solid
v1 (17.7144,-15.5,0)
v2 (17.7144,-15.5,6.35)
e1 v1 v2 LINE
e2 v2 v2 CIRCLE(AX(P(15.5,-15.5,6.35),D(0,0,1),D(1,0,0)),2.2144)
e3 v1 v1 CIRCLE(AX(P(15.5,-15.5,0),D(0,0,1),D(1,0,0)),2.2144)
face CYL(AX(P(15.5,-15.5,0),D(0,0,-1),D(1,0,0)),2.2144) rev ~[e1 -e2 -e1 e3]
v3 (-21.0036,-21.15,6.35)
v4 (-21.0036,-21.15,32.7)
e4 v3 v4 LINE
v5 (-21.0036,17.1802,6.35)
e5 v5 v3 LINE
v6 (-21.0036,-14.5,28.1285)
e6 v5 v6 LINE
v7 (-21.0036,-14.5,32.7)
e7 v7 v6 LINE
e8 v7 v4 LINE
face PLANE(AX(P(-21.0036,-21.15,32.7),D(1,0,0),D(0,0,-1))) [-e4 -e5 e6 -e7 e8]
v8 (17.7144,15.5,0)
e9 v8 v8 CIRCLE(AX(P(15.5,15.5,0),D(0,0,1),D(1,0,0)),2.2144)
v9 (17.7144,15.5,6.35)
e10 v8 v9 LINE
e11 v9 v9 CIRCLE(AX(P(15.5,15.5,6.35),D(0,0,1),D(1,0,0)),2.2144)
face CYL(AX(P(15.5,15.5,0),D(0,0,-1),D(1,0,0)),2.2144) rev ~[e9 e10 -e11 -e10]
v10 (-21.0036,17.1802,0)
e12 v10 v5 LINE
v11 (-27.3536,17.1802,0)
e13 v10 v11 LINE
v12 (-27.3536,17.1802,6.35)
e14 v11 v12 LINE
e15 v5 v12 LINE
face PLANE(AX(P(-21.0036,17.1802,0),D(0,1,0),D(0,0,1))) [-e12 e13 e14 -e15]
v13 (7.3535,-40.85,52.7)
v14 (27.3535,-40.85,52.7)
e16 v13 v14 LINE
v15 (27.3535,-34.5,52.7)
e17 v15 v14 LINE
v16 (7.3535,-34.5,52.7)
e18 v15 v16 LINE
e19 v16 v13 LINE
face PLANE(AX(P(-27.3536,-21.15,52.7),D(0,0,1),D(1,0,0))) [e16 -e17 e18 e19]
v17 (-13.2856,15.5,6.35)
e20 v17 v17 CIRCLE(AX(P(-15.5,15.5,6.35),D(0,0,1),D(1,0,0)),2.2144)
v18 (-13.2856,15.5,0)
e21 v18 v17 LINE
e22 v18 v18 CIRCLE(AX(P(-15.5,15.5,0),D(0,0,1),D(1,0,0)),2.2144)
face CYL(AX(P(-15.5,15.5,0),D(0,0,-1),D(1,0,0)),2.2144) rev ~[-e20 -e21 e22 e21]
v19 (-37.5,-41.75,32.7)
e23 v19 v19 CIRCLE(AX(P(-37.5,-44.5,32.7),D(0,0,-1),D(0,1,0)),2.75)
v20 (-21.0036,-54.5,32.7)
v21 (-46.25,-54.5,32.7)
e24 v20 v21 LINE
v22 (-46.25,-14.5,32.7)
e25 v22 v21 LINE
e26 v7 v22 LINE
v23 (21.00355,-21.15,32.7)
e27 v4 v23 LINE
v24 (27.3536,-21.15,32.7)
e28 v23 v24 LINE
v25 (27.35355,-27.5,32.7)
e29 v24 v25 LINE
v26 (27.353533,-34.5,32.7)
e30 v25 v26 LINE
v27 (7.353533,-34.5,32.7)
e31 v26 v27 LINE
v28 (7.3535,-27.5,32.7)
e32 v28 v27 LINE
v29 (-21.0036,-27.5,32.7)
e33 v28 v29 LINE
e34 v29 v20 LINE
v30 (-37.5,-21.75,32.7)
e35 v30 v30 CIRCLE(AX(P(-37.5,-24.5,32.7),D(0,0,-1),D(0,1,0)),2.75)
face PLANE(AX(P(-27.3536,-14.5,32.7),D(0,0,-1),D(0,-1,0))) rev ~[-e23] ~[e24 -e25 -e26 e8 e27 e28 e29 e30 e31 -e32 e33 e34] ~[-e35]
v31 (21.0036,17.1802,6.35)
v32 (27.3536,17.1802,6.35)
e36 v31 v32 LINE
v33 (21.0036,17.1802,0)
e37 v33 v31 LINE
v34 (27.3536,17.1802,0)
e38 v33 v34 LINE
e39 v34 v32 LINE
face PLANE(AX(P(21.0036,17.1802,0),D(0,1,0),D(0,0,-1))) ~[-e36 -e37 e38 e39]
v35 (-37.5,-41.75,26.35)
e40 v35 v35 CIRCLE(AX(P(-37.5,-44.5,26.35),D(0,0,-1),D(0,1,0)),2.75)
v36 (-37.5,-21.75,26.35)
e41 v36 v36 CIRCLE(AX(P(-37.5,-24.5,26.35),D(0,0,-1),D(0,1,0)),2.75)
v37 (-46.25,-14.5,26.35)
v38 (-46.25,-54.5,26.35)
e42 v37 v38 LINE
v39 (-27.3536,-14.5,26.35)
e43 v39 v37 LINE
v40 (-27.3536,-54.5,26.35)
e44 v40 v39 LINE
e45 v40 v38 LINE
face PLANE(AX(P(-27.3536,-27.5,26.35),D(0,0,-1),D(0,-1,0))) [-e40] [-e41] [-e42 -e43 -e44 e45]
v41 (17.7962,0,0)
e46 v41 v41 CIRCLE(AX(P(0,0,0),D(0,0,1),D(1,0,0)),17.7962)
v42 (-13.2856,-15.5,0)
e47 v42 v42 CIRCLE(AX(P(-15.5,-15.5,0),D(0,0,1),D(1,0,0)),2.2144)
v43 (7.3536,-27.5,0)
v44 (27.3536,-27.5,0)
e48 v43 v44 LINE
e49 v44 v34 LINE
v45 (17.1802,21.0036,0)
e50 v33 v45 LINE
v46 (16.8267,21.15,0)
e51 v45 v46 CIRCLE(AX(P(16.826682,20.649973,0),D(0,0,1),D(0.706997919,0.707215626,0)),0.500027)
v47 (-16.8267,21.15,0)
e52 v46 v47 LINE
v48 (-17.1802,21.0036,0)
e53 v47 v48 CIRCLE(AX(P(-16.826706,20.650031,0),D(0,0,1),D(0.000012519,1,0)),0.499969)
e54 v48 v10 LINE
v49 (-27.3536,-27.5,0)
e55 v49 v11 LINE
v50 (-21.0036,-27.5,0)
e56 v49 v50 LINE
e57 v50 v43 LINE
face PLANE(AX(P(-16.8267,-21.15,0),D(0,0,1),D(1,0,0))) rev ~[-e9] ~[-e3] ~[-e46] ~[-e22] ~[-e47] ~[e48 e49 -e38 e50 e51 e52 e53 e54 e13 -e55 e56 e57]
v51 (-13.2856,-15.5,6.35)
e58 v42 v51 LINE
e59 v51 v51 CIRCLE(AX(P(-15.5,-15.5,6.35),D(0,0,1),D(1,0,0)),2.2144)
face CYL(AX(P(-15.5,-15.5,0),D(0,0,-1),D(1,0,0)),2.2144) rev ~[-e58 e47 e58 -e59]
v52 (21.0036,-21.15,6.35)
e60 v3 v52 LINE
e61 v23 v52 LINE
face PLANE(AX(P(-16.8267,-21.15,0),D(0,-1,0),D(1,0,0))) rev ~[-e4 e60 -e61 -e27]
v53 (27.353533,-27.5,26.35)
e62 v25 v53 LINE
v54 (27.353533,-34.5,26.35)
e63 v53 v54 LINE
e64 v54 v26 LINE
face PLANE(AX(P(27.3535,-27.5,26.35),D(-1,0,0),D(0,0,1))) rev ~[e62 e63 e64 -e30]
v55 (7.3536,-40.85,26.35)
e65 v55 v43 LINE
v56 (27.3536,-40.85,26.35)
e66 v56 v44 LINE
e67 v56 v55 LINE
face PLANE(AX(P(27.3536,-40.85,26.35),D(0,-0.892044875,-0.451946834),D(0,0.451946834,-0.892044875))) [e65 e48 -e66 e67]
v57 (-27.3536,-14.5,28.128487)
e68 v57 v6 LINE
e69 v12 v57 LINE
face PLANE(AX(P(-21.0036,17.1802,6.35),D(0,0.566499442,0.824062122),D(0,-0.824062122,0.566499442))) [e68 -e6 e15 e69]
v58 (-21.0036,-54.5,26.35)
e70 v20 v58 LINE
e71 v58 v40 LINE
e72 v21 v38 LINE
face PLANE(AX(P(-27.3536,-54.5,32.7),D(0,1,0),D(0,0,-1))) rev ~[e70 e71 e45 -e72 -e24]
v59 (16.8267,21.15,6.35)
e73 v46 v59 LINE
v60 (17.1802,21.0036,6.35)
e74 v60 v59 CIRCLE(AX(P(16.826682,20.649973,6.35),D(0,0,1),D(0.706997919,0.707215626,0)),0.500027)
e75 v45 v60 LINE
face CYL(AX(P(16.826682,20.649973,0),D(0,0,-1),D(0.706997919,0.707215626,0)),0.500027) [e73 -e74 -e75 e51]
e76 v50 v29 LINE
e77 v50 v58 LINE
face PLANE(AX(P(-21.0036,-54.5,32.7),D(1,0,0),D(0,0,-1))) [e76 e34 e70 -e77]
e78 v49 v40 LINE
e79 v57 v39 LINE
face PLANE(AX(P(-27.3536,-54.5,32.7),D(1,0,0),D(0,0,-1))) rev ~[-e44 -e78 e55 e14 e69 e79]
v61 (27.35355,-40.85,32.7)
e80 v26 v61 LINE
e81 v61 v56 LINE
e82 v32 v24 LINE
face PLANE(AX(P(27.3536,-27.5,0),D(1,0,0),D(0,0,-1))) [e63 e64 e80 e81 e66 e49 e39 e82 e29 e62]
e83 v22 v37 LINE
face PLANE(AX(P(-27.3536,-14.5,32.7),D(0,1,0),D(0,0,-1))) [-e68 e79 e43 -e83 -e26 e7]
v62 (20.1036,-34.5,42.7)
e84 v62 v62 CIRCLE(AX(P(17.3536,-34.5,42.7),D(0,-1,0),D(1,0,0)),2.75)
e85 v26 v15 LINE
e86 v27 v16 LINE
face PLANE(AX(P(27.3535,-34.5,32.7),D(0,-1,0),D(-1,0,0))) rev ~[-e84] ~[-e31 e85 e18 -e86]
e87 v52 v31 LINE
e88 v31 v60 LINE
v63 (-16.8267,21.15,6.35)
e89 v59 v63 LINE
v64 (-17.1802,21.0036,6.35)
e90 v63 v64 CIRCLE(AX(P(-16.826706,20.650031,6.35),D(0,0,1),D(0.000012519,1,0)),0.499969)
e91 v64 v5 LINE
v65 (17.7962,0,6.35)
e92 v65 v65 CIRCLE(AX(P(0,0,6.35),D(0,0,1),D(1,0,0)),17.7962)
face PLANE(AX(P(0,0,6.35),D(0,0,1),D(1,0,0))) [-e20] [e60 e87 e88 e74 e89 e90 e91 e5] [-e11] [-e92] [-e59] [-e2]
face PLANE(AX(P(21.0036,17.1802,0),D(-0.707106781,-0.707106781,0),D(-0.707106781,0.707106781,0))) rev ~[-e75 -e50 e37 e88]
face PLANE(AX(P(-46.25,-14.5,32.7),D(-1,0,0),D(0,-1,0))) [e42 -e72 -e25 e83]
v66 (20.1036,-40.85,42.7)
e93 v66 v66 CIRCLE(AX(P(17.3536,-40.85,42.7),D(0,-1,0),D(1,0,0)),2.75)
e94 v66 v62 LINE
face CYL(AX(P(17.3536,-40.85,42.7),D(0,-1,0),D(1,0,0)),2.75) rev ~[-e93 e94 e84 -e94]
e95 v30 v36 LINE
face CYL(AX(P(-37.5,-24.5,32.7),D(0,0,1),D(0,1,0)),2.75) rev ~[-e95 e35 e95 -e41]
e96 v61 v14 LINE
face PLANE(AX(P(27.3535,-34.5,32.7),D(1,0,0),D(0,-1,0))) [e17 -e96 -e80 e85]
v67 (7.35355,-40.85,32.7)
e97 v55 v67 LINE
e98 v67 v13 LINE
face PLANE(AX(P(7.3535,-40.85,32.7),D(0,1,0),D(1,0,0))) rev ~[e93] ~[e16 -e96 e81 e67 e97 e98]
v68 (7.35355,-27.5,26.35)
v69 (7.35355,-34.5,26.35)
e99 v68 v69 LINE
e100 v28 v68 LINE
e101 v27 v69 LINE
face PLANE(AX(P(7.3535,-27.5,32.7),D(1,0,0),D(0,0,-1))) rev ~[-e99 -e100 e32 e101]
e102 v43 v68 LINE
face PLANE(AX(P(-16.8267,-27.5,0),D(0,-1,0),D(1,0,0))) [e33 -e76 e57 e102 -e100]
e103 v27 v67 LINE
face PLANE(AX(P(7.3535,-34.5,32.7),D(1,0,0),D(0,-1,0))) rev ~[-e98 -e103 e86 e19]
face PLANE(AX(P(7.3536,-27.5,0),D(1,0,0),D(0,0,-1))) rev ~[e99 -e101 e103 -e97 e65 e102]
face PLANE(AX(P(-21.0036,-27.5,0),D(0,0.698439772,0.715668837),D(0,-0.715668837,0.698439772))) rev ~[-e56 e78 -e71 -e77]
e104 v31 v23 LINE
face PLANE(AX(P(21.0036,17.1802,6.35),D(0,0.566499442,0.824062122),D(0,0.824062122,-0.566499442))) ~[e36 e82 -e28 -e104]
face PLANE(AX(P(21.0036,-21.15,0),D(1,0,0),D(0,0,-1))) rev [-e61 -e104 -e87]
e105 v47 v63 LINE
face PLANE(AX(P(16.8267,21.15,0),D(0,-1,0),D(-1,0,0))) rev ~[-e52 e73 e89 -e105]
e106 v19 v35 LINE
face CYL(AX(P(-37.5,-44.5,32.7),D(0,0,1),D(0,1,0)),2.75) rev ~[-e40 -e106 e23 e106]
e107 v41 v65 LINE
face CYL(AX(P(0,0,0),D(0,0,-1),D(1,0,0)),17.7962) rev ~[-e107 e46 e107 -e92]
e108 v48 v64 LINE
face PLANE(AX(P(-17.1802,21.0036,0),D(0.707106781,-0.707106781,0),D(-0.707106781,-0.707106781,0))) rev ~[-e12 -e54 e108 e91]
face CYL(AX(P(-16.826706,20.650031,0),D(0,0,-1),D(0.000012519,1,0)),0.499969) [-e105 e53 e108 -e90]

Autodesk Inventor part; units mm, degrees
sketch "Sketch1" plane through (0, 0, 0) normal (0, 0, 1) x (1, 0, 0)
  line L0 (-21.15, 16.8267) -> (-21.15, -16.8267) projected
  arc A0 (-21.15, -16.8267) -> (-21.0036, -17.1802) centre (-20.65, -16.8267) ccw projected
  line L1 (-21.0036, -17.1802) -> (-17.1802, -21.0036) projected
  arc A1 (-17.1802, -21.0036) -> (-16.8267, -21.15) centre (-16.8267, -20.65) ccw projected
  line L2 (-16.8267, -21.15) -> (16.8267, -21.15) projected
  arc A2 (16.8267, -21.15) -> (17.1802, -21.0036) centre (16.8267, -20.65) ccw projected
  line L3 (17.1802, -21.0036) -> (21.0036, -17.1802) projected
  arc A3 (21.0036, -17.1802) -> (21.15, -16.8267) centre (20.65, -16.8267) ccw projected
  line L4 (21.15, -16.8267) -> (21.15, 16.8267) projected
  arc A4 (21.15, 16.8267) -> (21.0036, 17.1802) centre (20.65, 16.8267) ccw projected
  line L5 (21.0036, 17.1802) -> (17.1802, 21.0036) projected
  arc A5 (17.1802, 21.0036) -> (16.8267, 21.15) centre (16.8267, 20.65) ccw projected
  line L6 (16.8267, 21.15) -> (-16.8267, 21.15) projected
  arc A6 (-16.8267, 21.15) -> (-17.1802, 21.0036) centre (-16.8267, 20.65) ccw projected
  line L7 (-17.1802, 21.0036) -> (-21.0036, 17.1802) projected
  arc A7 (-21.0036, 17.1802) -> (-21.15, 16.8267) centre (-20.65, 16.8267) ccw projected
  circle A8 centre (-15.5, -15.5) radius 1.75 projected
  circle A9 centre (-15.5, 15.5) radius 1.75 projected
  circle A10 centre (15.5, 15.5) radius 1.75 projected
  circle A11 centre (15.5, -15.5) radius 1.75 projected
  circle A12 centre (0, 0) radius 17 projected
  circle A13 centre (15.5, 15.5) radius 2.2144
  circle A14 centre (15.5, -15.5) radius 2.2144
  circle A15 centre (-15.5, -15.5) radius 2.2144
  circle A16 centre (-15.5, 15.5) radius 2.2144
  circle A17 centre (0, 0) radius 17.7962
extrude "Extrusion1" add sketch "Sketch1" along normal blind 6.35 contours A7 L7 A6 L6 A5 L5 A4 L4 A3 L3 A2 L2 A1 L1 A0 L0
sketch "Sketch2" plane through (-16.8267, -21.15, 0) normal (0, -1, 0) x (1, 0, 0)
  line L0 (0, 0) -> (33.6533, 0) projected
  line L1 (33.6533, 0) -> (33.6533, 6.35) projected
  line L2 (0, 6.35) -> (33.6533, 6.35) projected
  line L3 (0, 0) -> (0, 6.35) projected
  line L4 (-10.6733, 32.7) -> (65.5267, 32.7) projected
  line L5 (65.5267, 33.95) -> (-10.6733, 33.95) projected
  line L6 (65.5267, 33.95) -> (65.5267, 39.1) projected
  line L7 (65.5267, 39.1) -> (-10.6733, 39.1) projected
  line L8 (-10.6733, 33.95) -> (-10.6733, 39.1) projected
  line L9 (0, 0) -> (33.6533, 0)
  line L10 (33.6533, 0) -> (33.6533, 32.7)
  line L11 (33.6533, 32.7) -> (0, 32.7)
  line L12 (0, 32.7) -> (0, 0)
  line L13 (-4.1769, 0) -> (-0.3536, 0) projected
  line L14 (-0.3536, 0) -> (-0.3536, 6.35) projected
  line L15 (-4.1769, 6.35) -> (-0.3536, 6.35) projected
  line L16 (-4.1769, 0) -> (-4.1769, 6.35) projected
  line L17 (34.0069, 0) -> (37.8302, 0) projected
  line L18 (37.8302, 0) -> (37.8302, 6.35) projected
  line L19 (34.0069, 6.35) -> (37.8302, 6.35) projected
  line L20 (34.0069, 0) -> (34.0069, 6.35) projected
  line L21 (-4.1769, 0) -> (37.8302, 0)
  line L22 (37.8302, 0) -> (37.8302, 32.7)
  line L23 (37.8302, 32.7) -> (-4.1769, 32.7)
  line L24 (-4.1769, 32.7) -> (-4.1769, 0)
  point P0 (16.8267, 0)
extrude "Extrusion2" add sketch "Sketch2" along normal blind 6.35 contours L3 L2 L1 L0 | L21 L14 L15 L24 L4 L12 L3 | L1 L10 L4 L22 L19 L20 L21 | L12 L4 L10 L2 | L13 L16 L15 L14 | L20 L19 L18 L17
ref_plane "Work Plane1" through (0, -21.15, 0) normal (-1, 0, 0) x (0, 0, 1)
sketch "Sketch4" plane through (-21.0036, -21.15, 0) normal (-1, 0, 0) x (0, 0, 1)
  line L0 (0, 37.9767) -> (0, 4.3233) projected
  line L1 (0, 4.3233) -> (6.35, 4.3233) projected
  line L2 (6.35, 37.9767) -> (6.35, 4.3233) projected
  line L3 (0, 37.9767) -> (6.35, 37.9767) projected
  line L4 (32.7, 0) -> (0, 0) projected
  line L5 (0, 0) -> (0, -6.35) projected
  line L6 (32.7, -6.35) -> (0, -6.35) projected
  line L7 (32.7, 0) -> (32.7, -6.35) projected
  line L8 (6.35, 37.9767) -> (6.35, 4.3233) projected
  line L9 (32.7, 0) -> (32.7, -6.35) projected
  line L10 (0, 0.1464) -> (6.35, 0.1464) projected
  line L11 (0, 38.3302) -> (6.35, 38.3302) projected
  line L12 (0, 38.3302) -> (6.35, 38.3302)
  line L13 (6.35, 38.9462) -> (6.35, 3.3538) projected
  line L14 (6.35, 38.3302) -> (32.7, 0)
  line L15 (0, 0) -> (0, -6.35) projected
  line L16 (32.7, 0) -> (0, 0)
  line L17 (0, 0) -> (0, 38.3302)
  point P0 (0, 21.15)
extrude "Extrusion3" add sketch "Sketch4" along normal blind 6.35
mirror "Mirror1" about plane through (0, -21.15, 0) normal (-1, 0, 0) of "Extrusion3"
sketch "Sketch5" plane through (-16.8267, -27.5, 0) normal (0, -1, 0) x (1, 0, 0)
  line L0 (2.5767, 45.45) -> (8.0767, 45.45) projected
  arc A0 (8.0767, 39.95) -> (8.0767, 45.45) centre (8.0767, 42.7) ccw projected
  line L1 (8.0767, 39.95) -> (2.5767, 39.95) projected
  arc A1 (2.5767, 45.45) -> (2.5767, 39.95) centre (2.5767, 42.7) ccw projected
  line L2 (17.3267, 50.7) -> (-6.6733, 50.7) projected
  line L3 (-6.6733, 50.7) -> (-6.6733, 34.7) projected
  line L4 (-6.6733, 34.7) -> (17.3267, 34.7) projected
  line L5 (17.3267, 34.7) -> (17.3267, 50.7) projected
  line L6 (-10.5269, 32.7) -> (44.1802, 32.7) projected
  line L7 (-10.5269, 0) -> (-10.5269, 32.7) projected
  line L8 (44.1802, 0) -> (-10.5269, 0) projected
  line L9 (44.1802, 0) -> (44.1802, 32.7) projected
  line L10 (37.8302, 32.7) -> (44.1802, 32.7) projected
  line L11 (44.1802, 32.7) -> (24.1802, 32.7)
  line L12 (24.1802, 32.7) -> (24.1802, 26.35)
  line L13 (24.1802, 26.35) -> (44.1802, 26.35)
  line L14 (44.1802, 26.35) -> (44.1802, 32.7)
  point P0 (16.8267, 0)
  dimension "d6" = 20
  dimension "d7" = 6.35
ref_plane "Work Plane2" through (-27.5, -34.5, 33.95) normal (0, -1, 0) x (1, 0, 0)
extrude "Extrusion4" add sketch "Sketch5" along normal up to surface (7 mm away) contours L6 L9 L13 L12
sketch "Sketch6" plane through (7.3536, -34.5, 32.7) normal (0, -1, 0) x (1, 0, 0)
  line L0 (20, 0) -> (20, -6.35) projected
  line L1 (0, 0) -> (20, 0) projected
  line L2 (0, -6.35) -> (0, 0) projected
  line L3 (20, -6.35) -> (0, -6.35) projected
  point P0 (-7.3536, -32.7)
extrude "Extrusion5" add sketch "Sketch6" along normal blind 6.35
sketch "Sketch7" plane through (-27.3536, -21.15, 32.7) normal (0, 0, 1) x (1, 0, 0)
  line L0 (34.7071, -6.35) -> (34.7071, -19.7) projected
  line L1 (54.7071, 0) -> (54.7071, -19.7) projected
  line L2 (34.7071, -19.7) -> (54.7071, -19.7)
  line L3 (54.7071, -19.7) -> (54.7071, -13.35)
  line L4 (54.7071, -13.35) -> (34.7071, -13.35)
  line L5 (34.7071, -13.35) -> (34.7071, -19.7)
  point P0 (27.3536, 21.15)
  dimension "d12" = 6.35
extrude "Extrusion6" add sketch "Sketch7" along normal blind 20
sketch "Sketch8" plane through (7.3536, -40.85, 32.7) normal (0, -1, 0) x (1, 0, 0)
  line L0 (20, 20) -> (0, 20) projected
  line L1 (20, -6.35) -> (20, 20) projected
  line L2 (0, 20) -> (20, 20)
  line L3 (20, 20) -> (20, 0)
  line L4 (20, 0) -> (0, 0)
  line L5 (0, 0) -> (0, 20)
  circle A0 centre (10, 10) radius 2.75
  point P0 (-7.3536, -32.7)
  dimension "d15" = 20
  dimension "d16" = 5.5
extrude "Extrusion7" cut sketch "Sketch8" against normal blind 20 contours A0
ref_plane "Work Plane3" through (-33.9, -14.5, 32.7) normal (0, 0, -1) x (0, 1, 0)
sketch "Sketch9" plane through (-33.9, -14.5, 32.7) normal (0, 0, -1) x (0, 1, 0)
  line L0 (0, -12.35) -> (-1000, -12.35) projected
  line L1 (0, -12.35) -> (0, -7.2) projected
  line L2 (0, -7.2) -> (-1000, -7.2) construction
  line L3 (-1000, -12.35) -> (-1000, -7.2) projected
  line L4 (-1000, 5.15) -> (0, 5.15) construction
  line L5 (-1000, 0) -> (-1000, 5.15) projected
  line L6 (0, 0) -> (-1000, 0) construction
  line L7 (0, 0) -> (0, 5.15) projected
  line L8 (0, 5.15) -> (-40, 5.15) construction
  line L9 (-40, 5.15) -> (-40, -12.35)
  line L10 (-40, -12.35) -> (0, -12.35)
  line L11 (0, -12.35) -> (0, 5.15)
  line L12 (-6.5036, 51.0802) -> (-2.6802, 54.9036) projected
  arc A0 (-6.5036, 51.0802) -> (-6.65, 50.7267) centre (-6.15, 50.7267) ccw projected
  line L13 (-6.65, 50.7267) -> (-6.65, 54.9036) projected
  line L14 (-2.6802, 54.9036) -> (-6.65, 54.9036) projected
  line L15 (31.6802, 54.9036) -> (31.6802, 61.2536) projected
  line L16 (31.6802, 61.2536) -> (-13, 61.2536) projected
  line L17 (-13, 61.2536) -> (-13, 6.5464) projected
  line L18 (31.6802, 6.5464) -> (-13, 6.5464) projected
  line L19 (31.6802, 12.8964) -> (31.6802, 6.5464) projected
  line L20 (35.5036, 16.7198) -> (31.6802, 12.8964) projected
  arc A1 (35.5036, 16.7198) -> (35.65, 17.0733) centre (35.15, 17.0733) ccw projected
  line L21 (35.65, 50.7267) -> (35.65, 17.0733) projected
  arc A2 (35.65, 50.7267) -> (35.5036, 51.0802) centre (35.15, 50.7267) ccw projected
  line L22 (31.6802, 54.9036) -> (35.5036, 51.0802) projected
  line L23 (-6.65, 12.8964) -> (-6.65, 17.0733) projected
  arc A3 (-6.65, 17.0733) -> (-6.5036, 16.7198) centre (-6.15, 17.0733) ccw projected
  line L24 (-2.6802, 12.8964) -> (-6.5036, 16.7198) projected
  line L25 (-2.6802, 12.8964) -> (-6.65, 12.8964) projected
  circle A4 centre (14.5, 33.9) radius 17.7962 projected
  circle A5 centre (30, 18.4) radius 2.2144 projected
  circle A6 centre (-1, 18.4) radius 2.2144 projected
  circle A7 centre (-1, 49.4) radius 2.2144 projected
  circle A8 centre (30, 49.4) radius 2.2144 projected
  line L26 (0, 5.15) -> (-40, 5.15) construction
  line L27 (-40, 5.15) -> (-40, 6.5464)
  line L28 (-40, 6.5464) -> (0, 6.5464)
  line L29 (0, 6.5464) -> (0, 5.15)
  line L30 (-20, -3.6) -> (-40, -3.6) construction
  line L31 (-20, -12.35) -> (-20, 6.5464) construction
  line L32 (-20, -3.6) -> (0, -3.6) construction
  circle A9 centre (-10, -3.6) radius 2.75
  circle A10 centre (-30, -3.6) radius 2.75
  line L33 (0, -12.35) -> (-40, -12.35)
  line L34 (-40, -12.35) -> (-40, 6.5464)
  line L35 (-40, 6.5464) -> (0, 6.5464)
  line L36 (0, 6.5464) -> (0, -12.35)
  dimension "d19" = 40
  dimension "d20" = 5.5
extrude "Extrusion8" add sketch "Sketch9" along normal blind 6.35 contours L0 L9 L27 L28 L18 L29 L7 L11 L1
sketch "Sketch10" plane through (-27.3536, -54.5, 32.7) normal (1, 0, 0) x (0, 0, -1)
  line L0 (-1.6, 40) -> (-1.6, -960) projected
  line L1 (6.35, 27) -> (0, 27) projected
  line L2 (0, 27) -> (0, 0) projected
  line L3 (0, 0) -> (6.35, 0) projected
  line L4 (6.35, 27) -> (6.35, 0) projected
  point P0 (32.7, 54.5)
extrude "Extrusion9" add sketch "Sketch10" along normal blind 6.35
sketch "Sketch11" plane through (-21.0036, -54.5, 32.7) normal (1, 0, 0) x (0, 0, -1)
  line L0 (0, 27) -> (6.35, 27) projected
  line L1 (0, 27) -> (0, 0) projected
  line L2 (0, 0) -> (6.35, 0) projected
  line L3 (6.35, 0) -> (6.35, 27) projected
  line L4 (32.7, 27) -> (6.35, 27) projected
  line L5 (0, 0) -> (6.35, 0) projected
  line L6 (32.7, 27) -> (6.35, 0)
  line L7 (6.35, 27) -> (6.35, 13.65) projected
  line L8 (6.35, 0) -> (6.35, 27)
  line L9 (32.7, 71.6802) -> (32.7, 27) projected
  line L10 (6.35, 27) -> (32.7, 27)
  point P0 (32.7, 54.5)
extrude "Extrusion10" add sketch "Sketch11" against normal blind 6.35 contours L4 L6 L3
sketch "Sketch12" plane through (-27.3536, -21.15, 32.7) normal (1, 0, 0) x (0, 0, -1)
  line L0 (0, 0) -> (4.5715, 6.65) projected
  line L1 (0, 6.65) -> (4.5715, 6.65) projected
  line L2 (0, 6.65) -> (0, 0) projected
  point P0 (32.7, 21.15)
extrude "Extrusion11" add sketch "Sketch12" along normal up to surface (6.35 mm away)
sketch "Sketch13" plane through (27.3536, -27.5, 0) normal (1, 0, 0) x (0, 0, -1)
  line L0 (0, 44.6802) -> (0, 0) projected
  line L1 (-6.35, 44.6802) -> (0, 44.6802) projected
  line L2 (-32.7, 6.35) -> (-6.35, 44.6802) projected
  line L3 (-32.7, 6.35) -> (-32.7, -7) projected
  line L4 (-32.7, -7) -> (-52.7, -7) projected
  line L5 (-52.7, -13.35) -> (-52.7, -7) projected
  line L6 (-26.35, -13.35) -> (-52.7, -13.35) projected
  line L7 (-26.35, 0) -> (-26.35, -13.35) projected
  line L8 (0, 0) -> (-26.35, 0) projected
  line L9 (-26.35, -13.35) -> (0, 0)
  line L10 (-26.35, 0) -> (-26.35, -13.35)
  line L11 (-26.35, 13) -> (-26.35, -27) projected
  line L12 (-32.7, 0) -> (0, 0) projected
  line L13 (-26.35, 0) -> (0, 0)
  point P0 (0, 27.5)
extrude "Extrusion12" add sketch "Sketch13" against normal up to surface (20 mm away) contours L9 L7 L8
sketch "Sketch14" plane through (0, 0, 0) normal (0, 0, -1) x (-1, 0, 0)
  line L0 (-17.1802, -21.0036) -> (-21.0036, -17.1802) projected
  arc A0 (-17.1802, -21.0036) -> (-16.8267, -21.15) centre (-16.8267, -20.65) ccw projected
  line L1 (-16.8267, -21.15) -> (-21.0036, -21.15) projected
  line L2 (-21.0036, -17.1802) -> (-21.0036, -21.15) projected
  line L3 (-21.0036, 17.1802) -> (-27.3536, 17.1802) projected
  line L4 (-27.3536, 17.1802) -> (-27.3536, -27.5) projected
  line L5 (-27.3536, -27.5) -> (-7.3536, -27.5) projected
  line L6 (-7.3536, -27.5) -> (21.0036, -27.5) projected
  line L7 (21.0036, -27.5) -> (27.3536, -27.5) projected
  line L8 (27.3536, 17.1802) -> (27.3536, -27.5) projected
  line L9 (21.0036, 17.1802) -> (27.3536, 17.1802) projected
  line L10 (17.1802, 21.0036) -> (21.0036, 17.1802) projected
  arc A1 (17.1802, 21.0036) -> (16.8267, 21.15) centre (16.8267, 20.65) ccw projected
  line L11 (-16.8267, 21.15) -> (16.8267, 21.15) projected
  arc A2 (-16.8267, 21.15) -> (-17.1802, 21.0036) centre (-16.8267, 20.65) ccw projected
  line L12 (-21.0036, 17.1802) -> (-17.1802, 21.0036) projected
  line L13 (21.0036, -21.15) -> (16.8267, -21.15) projected
  arc A3 (16.8267, -21.15) -> (17.1802, -21.0036) centre (16.8267, -20.65) ccw projected
  line L14 (21.0036, -17.1802) -> (17.1802, -21.0036) projected
  line L15 (21.0036, -17.1802) -> (21.0036, -21.15) projected
  circle A4 centre (0, 0) radius 17.7962 projected
  circle A5 centre (15.5, 15.5) radius 2.2144 projected
  circle A6 centre (15.5, -15.5) radius 2.2144 projected
  circle A7 centre (-15.5, -15.5) radius 2.2144 projected
  circle A8 centre (-15.5, 15.5) radius 2.2144 projected
extrude "Extrusion13" add sketch "Sketch14" against normal up to surface (6.35 mm away) contours A0 L1 L2 L0 | L13 A3 L14 L15
properties part number "motorBracket"
